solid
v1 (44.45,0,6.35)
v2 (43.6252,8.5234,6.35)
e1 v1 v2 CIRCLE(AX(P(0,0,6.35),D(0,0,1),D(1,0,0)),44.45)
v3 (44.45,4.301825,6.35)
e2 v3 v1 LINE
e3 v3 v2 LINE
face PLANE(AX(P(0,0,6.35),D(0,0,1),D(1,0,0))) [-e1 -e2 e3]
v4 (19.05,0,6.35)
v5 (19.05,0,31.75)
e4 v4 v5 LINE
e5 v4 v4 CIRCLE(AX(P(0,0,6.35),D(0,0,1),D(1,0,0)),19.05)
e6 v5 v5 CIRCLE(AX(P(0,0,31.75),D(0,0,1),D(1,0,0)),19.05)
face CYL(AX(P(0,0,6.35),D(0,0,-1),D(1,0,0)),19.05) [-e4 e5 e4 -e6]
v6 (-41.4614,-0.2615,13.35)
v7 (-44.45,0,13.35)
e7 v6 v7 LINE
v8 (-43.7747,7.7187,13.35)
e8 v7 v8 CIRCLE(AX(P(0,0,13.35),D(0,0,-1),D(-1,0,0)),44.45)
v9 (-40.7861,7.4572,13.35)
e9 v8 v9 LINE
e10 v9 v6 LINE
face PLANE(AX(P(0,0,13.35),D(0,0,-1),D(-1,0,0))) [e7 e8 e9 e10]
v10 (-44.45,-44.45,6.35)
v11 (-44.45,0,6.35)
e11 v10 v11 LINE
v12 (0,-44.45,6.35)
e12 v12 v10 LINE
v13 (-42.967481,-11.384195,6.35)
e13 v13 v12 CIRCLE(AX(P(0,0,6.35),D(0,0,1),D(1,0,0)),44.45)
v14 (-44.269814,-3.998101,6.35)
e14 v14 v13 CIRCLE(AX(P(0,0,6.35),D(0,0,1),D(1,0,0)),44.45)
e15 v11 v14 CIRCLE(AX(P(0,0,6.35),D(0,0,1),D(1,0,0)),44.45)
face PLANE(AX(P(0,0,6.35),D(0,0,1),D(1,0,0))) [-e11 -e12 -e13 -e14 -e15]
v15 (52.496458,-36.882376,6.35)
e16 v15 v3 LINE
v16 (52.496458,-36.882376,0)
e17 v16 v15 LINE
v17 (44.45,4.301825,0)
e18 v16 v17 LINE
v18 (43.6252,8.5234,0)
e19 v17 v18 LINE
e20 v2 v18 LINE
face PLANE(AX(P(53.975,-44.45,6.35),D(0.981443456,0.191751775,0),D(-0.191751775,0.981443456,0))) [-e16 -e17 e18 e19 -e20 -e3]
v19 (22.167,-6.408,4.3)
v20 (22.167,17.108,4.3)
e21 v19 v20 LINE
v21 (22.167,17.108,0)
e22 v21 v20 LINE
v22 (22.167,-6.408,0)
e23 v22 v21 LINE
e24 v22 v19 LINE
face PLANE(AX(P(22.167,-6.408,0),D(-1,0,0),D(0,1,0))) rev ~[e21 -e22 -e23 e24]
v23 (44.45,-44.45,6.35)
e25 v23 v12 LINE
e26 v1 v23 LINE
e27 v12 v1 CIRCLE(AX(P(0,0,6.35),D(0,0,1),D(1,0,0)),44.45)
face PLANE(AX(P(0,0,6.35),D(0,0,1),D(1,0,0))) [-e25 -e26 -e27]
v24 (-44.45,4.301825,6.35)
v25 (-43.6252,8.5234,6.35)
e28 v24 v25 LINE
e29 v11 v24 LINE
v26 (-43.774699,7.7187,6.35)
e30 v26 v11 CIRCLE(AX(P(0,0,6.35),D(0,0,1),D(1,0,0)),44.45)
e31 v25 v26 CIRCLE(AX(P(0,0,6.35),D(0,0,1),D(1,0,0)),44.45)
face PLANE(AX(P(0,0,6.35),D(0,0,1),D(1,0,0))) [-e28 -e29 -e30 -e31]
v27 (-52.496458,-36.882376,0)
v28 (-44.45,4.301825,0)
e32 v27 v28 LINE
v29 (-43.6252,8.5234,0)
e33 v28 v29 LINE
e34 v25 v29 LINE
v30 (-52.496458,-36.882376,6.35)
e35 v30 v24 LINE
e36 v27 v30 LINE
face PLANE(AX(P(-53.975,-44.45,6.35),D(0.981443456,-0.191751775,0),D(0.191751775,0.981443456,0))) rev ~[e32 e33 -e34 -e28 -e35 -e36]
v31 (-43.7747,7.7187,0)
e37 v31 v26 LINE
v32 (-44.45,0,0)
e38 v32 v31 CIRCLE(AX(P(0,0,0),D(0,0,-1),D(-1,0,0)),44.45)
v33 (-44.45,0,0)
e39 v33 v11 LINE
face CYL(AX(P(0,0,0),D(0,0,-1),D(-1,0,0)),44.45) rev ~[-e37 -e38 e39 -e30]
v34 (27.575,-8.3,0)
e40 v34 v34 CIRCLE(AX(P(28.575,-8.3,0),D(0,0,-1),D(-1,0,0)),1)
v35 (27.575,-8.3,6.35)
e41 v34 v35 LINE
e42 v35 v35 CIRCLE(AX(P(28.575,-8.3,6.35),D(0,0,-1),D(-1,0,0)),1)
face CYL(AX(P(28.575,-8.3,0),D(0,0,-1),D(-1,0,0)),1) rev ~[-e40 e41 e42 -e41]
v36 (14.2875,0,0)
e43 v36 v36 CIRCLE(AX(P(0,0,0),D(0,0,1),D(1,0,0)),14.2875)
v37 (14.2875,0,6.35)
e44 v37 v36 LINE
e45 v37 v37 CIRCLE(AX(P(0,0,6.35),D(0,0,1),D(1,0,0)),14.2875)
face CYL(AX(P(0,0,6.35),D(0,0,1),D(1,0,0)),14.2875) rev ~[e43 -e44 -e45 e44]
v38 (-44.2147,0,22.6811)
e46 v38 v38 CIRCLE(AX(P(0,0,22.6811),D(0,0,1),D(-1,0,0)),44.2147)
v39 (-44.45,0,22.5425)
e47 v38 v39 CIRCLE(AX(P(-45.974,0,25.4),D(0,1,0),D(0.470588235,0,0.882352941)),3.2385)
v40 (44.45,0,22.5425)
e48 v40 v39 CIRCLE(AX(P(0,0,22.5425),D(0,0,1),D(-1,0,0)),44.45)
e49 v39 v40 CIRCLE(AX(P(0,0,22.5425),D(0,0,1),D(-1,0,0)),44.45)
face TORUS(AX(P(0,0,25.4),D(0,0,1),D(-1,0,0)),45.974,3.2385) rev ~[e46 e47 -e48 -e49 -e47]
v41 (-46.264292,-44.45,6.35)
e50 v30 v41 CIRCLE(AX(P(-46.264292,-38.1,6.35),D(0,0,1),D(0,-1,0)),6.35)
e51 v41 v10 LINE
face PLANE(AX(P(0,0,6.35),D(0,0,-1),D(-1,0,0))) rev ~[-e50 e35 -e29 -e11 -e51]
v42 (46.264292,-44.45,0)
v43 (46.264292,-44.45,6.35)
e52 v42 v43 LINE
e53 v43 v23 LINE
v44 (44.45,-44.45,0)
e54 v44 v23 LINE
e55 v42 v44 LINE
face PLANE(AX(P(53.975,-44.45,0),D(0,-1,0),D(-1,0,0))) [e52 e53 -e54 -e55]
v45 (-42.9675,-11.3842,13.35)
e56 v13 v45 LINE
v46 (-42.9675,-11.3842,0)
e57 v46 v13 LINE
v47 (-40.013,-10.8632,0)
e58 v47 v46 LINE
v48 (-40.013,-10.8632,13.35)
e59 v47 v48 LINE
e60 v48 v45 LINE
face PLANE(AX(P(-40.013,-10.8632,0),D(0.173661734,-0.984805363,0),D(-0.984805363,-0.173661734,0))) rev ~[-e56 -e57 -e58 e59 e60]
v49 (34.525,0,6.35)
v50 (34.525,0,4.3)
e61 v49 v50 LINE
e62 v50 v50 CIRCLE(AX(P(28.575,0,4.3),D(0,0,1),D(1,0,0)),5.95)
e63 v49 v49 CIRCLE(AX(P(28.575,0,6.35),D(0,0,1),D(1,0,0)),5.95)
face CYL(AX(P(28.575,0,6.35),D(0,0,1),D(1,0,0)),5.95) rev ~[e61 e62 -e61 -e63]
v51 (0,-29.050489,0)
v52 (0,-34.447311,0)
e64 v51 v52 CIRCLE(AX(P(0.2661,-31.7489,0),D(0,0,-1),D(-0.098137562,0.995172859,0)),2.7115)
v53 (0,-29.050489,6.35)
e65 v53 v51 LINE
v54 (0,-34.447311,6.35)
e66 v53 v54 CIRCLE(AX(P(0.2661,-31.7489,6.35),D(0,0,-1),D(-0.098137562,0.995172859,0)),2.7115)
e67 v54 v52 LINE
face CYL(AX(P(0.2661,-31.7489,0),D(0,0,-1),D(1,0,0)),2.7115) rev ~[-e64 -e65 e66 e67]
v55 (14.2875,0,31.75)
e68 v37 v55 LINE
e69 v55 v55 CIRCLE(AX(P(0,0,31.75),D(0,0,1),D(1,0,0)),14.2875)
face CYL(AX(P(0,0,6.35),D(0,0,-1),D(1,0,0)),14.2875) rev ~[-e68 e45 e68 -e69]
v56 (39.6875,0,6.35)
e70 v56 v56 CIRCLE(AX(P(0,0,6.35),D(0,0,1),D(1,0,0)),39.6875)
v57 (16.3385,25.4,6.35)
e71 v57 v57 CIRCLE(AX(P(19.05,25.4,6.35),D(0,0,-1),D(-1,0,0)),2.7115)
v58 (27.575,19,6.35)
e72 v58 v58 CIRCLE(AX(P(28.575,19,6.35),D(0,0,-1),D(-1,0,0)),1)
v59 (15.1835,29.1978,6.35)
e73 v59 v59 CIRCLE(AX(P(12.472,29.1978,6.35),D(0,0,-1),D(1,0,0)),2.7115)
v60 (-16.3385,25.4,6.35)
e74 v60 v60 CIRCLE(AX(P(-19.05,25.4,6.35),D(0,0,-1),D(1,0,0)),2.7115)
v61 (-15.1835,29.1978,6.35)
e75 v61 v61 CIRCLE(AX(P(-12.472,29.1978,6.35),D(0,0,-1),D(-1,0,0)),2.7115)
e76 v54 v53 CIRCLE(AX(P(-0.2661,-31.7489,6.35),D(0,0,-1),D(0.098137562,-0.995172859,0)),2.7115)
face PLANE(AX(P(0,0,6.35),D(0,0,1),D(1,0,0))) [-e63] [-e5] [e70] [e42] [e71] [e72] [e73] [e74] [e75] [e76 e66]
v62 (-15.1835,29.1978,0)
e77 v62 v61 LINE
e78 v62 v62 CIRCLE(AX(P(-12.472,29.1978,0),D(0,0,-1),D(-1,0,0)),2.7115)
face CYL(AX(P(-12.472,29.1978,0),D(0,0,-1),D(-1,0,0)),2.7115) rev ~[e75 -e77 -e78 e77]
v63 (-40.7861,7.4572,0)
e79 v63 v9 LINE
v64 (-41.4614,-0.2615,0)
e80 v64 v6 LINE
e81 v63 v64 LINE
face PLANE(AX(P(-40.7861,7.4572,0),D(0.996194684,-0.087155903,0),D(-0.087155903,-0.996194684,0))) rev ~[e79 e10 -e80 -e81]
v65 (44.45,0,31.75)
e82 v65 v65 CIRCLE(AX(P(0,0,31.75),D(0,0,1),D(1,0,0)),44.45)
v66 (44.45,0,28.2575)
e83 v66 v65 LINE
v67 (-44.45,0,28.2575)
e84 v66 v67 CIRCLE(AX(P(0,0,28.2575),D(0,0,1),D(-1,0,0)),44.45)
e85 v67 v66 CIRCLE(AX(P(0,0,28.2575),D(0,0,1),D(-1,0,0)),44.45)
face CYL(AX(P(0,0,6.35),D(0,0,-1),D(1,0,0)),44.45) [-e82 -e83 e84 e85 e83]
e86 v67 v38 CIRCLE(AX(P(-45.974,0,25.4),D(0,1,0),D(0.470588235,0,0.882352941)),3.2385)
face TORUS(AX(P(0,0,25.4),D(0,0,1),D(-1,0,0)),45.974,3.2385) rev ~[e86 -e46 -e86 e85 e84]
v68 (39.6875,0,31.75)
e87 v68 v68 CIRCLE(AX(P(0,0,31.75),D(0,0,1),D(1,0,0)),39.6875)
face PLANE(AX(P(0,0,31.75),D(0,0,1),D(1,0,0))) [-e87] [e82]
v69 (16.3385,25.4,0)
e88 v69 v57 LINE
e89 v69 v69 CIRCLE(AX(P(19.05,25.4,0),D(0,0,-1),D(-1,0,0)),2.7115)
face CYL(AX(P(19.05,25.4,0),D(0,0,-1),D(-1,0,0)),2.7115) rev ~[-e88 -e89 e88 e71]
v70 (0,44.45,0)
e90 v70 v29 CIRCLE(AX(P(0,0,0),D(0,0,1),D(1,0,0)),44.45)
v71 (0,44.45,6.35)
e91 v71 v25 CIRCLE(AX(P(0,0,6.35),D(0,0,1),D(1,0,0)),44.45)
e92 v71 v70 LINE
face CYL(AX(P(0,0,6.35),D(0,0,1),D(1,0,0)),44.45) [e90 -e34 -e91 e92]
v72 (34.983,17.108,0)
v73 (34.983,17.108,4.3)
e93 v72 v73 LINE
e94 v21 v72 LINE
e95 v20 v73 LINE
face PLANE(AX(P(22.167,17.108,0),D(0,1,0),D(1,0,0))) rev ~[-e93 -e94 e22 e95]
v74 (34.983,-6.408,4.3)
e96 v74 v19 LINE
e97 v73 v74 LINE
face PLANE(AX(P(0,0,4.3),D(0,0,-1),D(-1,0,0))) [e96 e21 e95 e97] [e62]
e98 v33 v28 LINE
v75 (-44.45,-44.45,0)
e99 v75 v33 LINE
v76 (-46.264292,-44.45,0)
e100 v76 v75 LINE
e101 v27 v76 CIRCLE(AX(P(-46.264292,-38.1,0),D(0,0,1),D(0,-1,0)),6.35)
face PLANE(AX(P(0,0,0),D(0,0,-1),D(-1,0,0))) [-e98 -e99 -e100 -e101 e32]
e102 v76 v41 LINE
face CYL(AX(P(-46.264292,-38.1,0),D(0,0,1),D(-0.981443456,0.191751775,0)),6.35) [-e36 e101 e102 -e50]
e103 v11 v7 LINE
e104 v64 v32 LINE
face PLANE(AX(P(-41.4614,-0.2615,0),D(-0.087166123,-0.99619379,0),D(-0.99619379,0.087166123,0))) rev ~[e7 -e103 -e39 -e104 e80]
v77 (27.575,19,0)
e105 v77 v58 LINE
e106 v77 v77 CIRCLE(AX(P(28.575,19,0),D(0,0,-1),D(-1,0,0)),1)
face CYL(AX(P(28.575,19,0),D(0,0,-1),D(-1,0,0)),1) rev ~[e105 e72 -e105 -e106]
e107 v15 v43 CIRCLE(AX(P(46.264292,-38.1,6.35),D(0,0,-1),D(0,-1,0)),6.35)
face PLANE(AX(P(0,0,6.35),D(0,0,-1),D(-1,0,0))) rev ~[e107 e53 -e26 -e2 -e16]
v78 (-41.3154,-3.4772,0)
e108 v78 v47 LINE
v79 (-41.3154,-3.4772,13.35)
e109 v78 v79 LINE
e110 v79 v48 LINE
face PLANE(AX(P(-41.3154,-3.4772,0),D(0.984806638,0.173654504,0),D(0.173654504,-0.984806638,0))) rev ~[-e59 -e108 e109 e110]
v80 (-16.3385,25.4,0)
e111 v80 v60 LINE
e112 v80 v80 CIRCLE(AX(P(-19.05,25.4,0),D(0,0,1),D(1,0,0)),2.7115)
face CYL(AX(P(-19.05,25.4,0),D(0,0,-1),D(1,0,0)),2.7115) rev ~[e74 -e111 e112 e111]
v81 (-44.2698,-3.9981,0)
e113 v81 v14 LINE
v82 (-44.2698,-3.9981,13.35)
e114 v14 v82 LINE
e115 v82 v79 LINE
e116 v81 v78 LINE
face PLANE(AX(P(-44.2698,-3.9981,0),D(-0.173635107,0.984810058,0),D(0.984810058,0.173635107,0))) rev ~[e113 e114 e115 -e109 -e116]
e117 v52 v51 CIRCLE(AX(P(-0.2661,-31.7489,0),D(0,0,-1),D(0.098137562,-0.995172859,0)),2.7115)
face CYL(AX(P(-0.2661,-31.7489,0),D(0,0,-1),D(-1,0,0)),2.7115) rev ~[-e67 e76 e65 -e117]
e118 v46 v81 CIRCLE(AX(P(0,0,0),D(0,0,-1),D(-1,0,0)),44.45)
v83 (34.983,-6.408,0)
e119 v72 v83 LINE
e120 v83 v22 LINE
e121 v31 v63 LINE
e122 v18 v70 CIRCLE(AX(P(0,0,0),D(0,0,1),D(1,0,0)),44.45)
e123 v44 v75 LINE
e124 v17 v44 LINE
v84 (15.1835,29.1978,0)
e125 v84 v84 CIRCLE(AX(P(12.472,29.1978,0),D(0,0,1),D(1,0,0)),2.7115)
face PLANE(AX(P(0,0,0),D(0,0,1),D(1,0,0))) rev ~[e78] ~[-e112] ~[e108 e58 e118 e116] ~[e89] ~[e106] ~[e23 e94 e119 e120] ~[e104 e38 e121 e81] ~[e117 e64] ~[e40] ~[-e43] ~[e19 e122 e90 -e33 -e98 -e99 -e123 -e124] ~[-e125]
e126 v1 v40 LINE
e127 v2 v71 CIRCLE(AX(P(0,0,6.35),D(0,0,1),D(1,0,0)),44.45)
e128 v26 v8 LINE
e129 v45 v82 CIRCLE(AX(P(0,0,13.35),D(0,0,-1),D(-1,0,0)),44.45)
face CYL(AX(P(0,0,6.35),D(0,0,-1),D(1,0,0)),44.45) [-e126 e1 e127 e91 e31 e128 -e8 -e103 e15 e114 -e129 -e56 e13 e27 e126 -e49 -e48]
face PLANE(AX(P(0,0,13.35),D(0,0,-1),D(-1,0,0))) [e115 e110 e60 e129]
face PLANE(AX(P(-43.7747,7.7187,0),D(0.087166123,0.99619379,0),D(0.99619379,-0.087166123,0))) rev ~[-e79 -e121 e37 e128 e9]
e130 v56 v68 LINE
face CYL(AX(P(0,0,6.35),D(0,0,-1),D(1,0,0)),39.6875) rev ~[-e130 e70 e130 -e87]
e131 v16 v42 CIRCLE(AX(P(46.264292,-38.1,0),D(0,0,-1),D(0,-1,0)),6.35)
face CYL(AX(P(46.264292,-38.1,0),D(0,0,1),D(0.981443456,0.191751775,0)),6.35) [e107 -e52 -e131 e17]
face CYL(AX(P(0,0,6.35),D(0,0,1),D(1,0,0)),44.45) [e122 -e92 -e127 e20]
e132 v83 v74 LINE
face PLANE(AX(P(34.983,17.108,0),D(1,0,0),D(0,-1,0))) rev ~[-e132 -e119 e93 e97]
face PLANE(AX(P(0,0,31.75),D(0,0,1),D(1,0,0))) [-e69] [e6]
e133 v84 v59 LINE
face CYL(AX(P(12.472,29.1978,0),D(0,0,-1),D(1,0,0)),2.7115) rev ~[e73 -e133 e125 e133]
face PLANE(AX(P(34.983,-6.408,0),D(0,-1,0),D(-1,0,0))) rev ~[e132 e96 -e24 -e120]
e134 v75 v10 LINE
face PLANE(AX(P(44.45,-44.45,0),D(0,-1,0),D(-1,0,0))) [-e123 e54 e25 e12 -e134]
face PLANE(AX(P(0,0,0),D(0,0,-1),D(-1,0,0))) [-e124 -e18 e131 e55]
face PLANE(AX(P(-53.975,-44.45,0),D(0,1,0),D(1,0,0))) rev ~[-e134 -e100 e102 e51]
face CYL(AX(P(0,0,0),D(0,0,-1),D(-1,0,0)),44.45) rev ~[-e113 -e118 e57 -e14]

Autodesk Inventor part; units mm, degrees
ref_plane "YZ Plane" through (0, 0, 0) normal (1, 0, 0) x (0, 1, 0)
ref_plane "XZ Plane" through (0, 0, 0) normal (0, 1, 0) x (-1, 0, 0)
ref_plane "XY Plane" through (0, 0, 0) normal (0, 0, 1) x (1, 0, 0)
sketch "Sketch1" plane through (0, 0, 0) normal (0, 0, 1) x (1, 0, 0)
  circle A0 centre (0, 0) radius 44.45
  line L0 (-44.45, 44.45) -> (44.45, 44.45)
  line L1 (44.45, 44.45) -> (44.45, -44.45)
  line L2 (44.45, -44.45) -> (-44.45, -44.45)
  line L3 (-44.45, -44.45) -> (-44.45, 44.45)
  dimension "d0" = 88.9
  dimension "d1" = 88.9
  dimension "d2" = 88.9
  dimension "d3" = 44.45
  dimension "d4" = 44.45
extrude "Extrusion1" add sketch "Sketch1" along normal blind 6.35
sketch "Sketch2" plane through (0, 0, 6.35) normal (0, 0, 1) x (1, 0, 0)
  circle A0 centre (0, 0) radius 46.0375
  circle A1 centre (0, 0) radius 44.45
  circle A2 centre (0, 0) radius 39.6875
  dimension "d8" = 1.5875
  dimension "d46" = 88.9
  dimension "d82" = 79.375
extrude "Extrusion2" add sketch "Sketch2" along normal blind 25.4 contours A1
sketch "Sketch3" plane through (0, 0, 6.35) normal (0, 0, 1) x (1, 0, 0)
  circle A0 centre (0, 0) radius 14.2875
  dimension "d11" = 28.575
extrude "Extrusion3" cut sketch "Sketch3" against normal blind 38.1
sketch "Sketch4" plane through (0, 0, 6.35) normal (0, 0, 1) x (1, 0, 0)
  circle A0 centre (0, 0) radius 14.2875 projected
  circle A1 centre (0, 0) radius 19.05
  dimension "d14" = 38.1
extrude "Extrusion4" add sketch "Sketch4" along normal blind 25.4
sketch "Sketch7" plane through (0, 0, 6.35) normal (0, 0, 1) x (1, 0, 0)
  line L0 (44.45, 44.45) -> (0, 44.45) projected
  line L1 (-44.45, 44.45) -> (-44.45, 0) projected
  line L2 (-44.45, -44.45) -> (0, -44.45) projected
  line L3 (44.45, -44.45) -> (44.45, 0) projected
  line L4 (44.45, -44.45) -> (44.45, 44.45) projected
  line L5 (-44.45, 0) -> (-44.45, -44.45)
  line L6 (-44.45, -44.45) -> (0, -44.45)
  line L7 (44.45, -44.45) -> (-44.45, -44.45) projected
  line L8 (0, -44.45) -> (44.45, -44.45)
  line L9 (44.45, -44.45) -> (44.45, 0)
  arc A0 (-44.45, 0) -> (0, -44.45) centre (0, 0) ccw
  arc A1 (0, -44.45) -> (44.45, 0) centre (0, 0) ccw
  arc A2 (44.45, 0) -> (0, 44.45) centre (0, 0) ccw projected
  line L10 (44.45, 0) -> (44.45, 44.45) projected
  arc A3 (0, 44.45) -> (-44.45, 0) centre (0, 0) ccw projected
  line L11 (0, 44.45) -> (-44.45, 44.45) projected
  arc A4 (-44.45, 0) -> (0, -44.45) centre (0, 0) ccw projected
  line L12 (-44.45, 0) -> (-44.45, -44.45) projected
  arc A5 (0, -44.45) -> (44.45, 0) centre (0, 0) ccw projected
  line L13 (0, -44.45) -> (44.45, -44.45) projected
  point P0 (-44.4261, -1.4578)
  point P1 (44.4261, -1.4578)
extrude "Extrusion7" [suppressed]
sketch "Sketch8" plane through (0, 0, 0) normal (0, 1, 0) x (-1, 0, 0)
  line L0 (44.45, 6.35) -> (44.45, 31.75) projected
  arc A0 (44.45, 28.2575) -> (44.45, 22.5425) centre (45.974, 25.4) ccw
  line L1 (44.45, 31.75) -> (-44.45, 31.75) projected
  line L2 (0, -7.62) -> (0, 45.72) projected
  arc A1 (44.2147, 22.6811) -> (44.45, 28.2575) centre (45.974, 25.4) ccw
  point P0 (0, 0)
  dimension "d28" = 3.2385
  dimension "d31" = 19.05
  dimension "d45" = 1.7145
revolve "Revolution1" cut sketch "Sketch8" angle 360 about axis through (0, 0, -10) along (0, 0, 1) contours A0 L0
sketch "Sketch11" plane through (0, 0, 0) normal (0, 1, 0) x (-1, 0, 0)
  line L0 (-19.05, 6.35) -> (-19.05, 31.75) projected
  line L1 (-19.05, 38.1) -> (-26.605, 25.4)
  line L2 (-26.605, 25.4) -> (-23.8011, 25.4)
  line L3 (44.45, 28.2575) -> (-44.45, 28.2575) projected
  line L4 (-23.8011, 25.4) -> (-17.684, 35.6829)
  point P0 (0, 0)
  dimension "d43" = 25.4
  dimension "d44" = 12.7
sketch "Sketch12" plane through (-44.45, 44.45, 0) normal (0, 1, 0) x (1, 0, 0)
  line L0 (0, 0) -> (88.9, 0) projected
  line L1 (0, 0) -> (0, -6.35) projected
  line L2 (44.45, -6.35) -> (0, -6.35) projected
  line L3 (88.9, 0) -> (88.9, -6.35) projected
  line L4 (88.9, -6.35) -> (44.45, -6.35) projected
  point P0 (44.45, 0)
sketch "Sketch13" plane through (0, 0, 0) normal (0, 0, -1) x (-1, 0, 0)
  circle A0 centre (0, 0) radius 44.45 projected
  arc A1 (-44.45, 0) -> (0, -44.45) centre (0, 0) ccw projected
  line L0 (-7.4513, 43.821) -> (0.0223, 44.45)
  line L1 (0.0223, 44.45) -> (0.2739, 41.4606)
  line L2 (0.2739, 41.4606) -> (-7.1997, 40.8316)
  line L3 (-7.1997, 40.8316) -> (-7.4513, 43.821)
  line L4 (4.1443, 44.2564) -> (11.526, 42.9296)
  line L5 (11.526, 42.9296) -> (10.9953, 39.9769)
  line L6 (10.9953, 39.9769) -> (3.6136, 41.3037)
  line L7 (3.6136, 41.3037) -> (4.1443, 44.2564)
  line L8 (0, 0) -> (0, 70.1731) construction
  line L9 (0, 0) -> (-12.1854, 69.107) construction
  line L10 (0, 0) -> (-24.0006, 65.9411) construction
  line L11 (0, 0) -> (-35.0865, 60.7717) construction
  line L12 (0, 0) -> (-45.1064, 53.7557) construction
  line L13 (0, 0) -> (-53.7557, 45.1064) construction
  line L14 (0, 0) -> (-60.7717, 35.0865) construction
  line L15 (0, 0) -> (-65.9411, 24.0006) construction
  line L16 (0, 0) -> (-69.107, 12.1854) construction
  line L17 (0, 0) -> (-70.1731, 0) construction
  line L18 (0, 0) -> (-69.107, -12.1854) construction
  line L19 (0, 0) -> (-65.9411, -24.0006) construction
  line L20 (0, 0) -> (-60.7717, -35.0865) construction
  line L21 (0, 0) -> (-53.7557, -45.1064) construction
  line L22 (0, 0) -> (-45.1064, -53.7557) construction
  line L23 (0, 0) -> (-35.0865, -60.7717) construction
  line L24 (0, 0) -> (-24.0006, -65.9411) construction
  line L25 (0, 0) -> (-12.1854, -69.107) construction
  line L26 (0, 0) -> (0, -70.1731) construction
  line L27 (0, 0) -> (12.1854, -69.107) construction
  line L28 (0, 0) -> (24.0006, -65.9411) construction
  line L29 (0, 0) -> (35.0865, -60.7717) construction
  line L30 (0, 0) -> (45.1064, -53.7557) construction
  line L31 (0, 0) -> (53.7557, -45.1064) construction
  line L32 (0, 0) -> (60.7717, -35.0865) construction
  line L33 (0, 0) -> (65.9411, -24.0006) construction
  line L34 (0, 0) -> (69.107, -12.1854) construction
  line L35 (0, 0) -> (70.1731, 0) construction
  line L36 (0, 0) -> (69.107, 12.1854) construction
  line L37 (0, 0) -> (65.9411, 24.0006) construction
  line L38 (0, 0) -> (60.7717, 35.0865) construction
  line L39 (0, 0) -> (53.7557, 45.1064) construction
  line L40 (0, 0) -> (45.1064, 53.7557) construction
  line L41 (0, 0) -> (35.0865, 60.7717) construction
  line L42 (0, 0) -> (24.0006, 65.9411) construction
  line L43 (0, 0) -> (12.1854, 69.107) construction
  arc A2 (0, 44.45) -> (-44.45, 0) centre (0, 0) ccw projected
  line L44 (44.45, 0) -> (43.7747, 7.7187)
  line L45 (43.7747, 7.7187) -> (40.7861, 7.4572)
  line L46 (40.7861, 7.4572) -> (41.4614, -0.2615)
  line L47 (41.4614, -0.2615) -> (44.45, 0)
  circle A3 centre (0, 0) radius 44.45 projected
  line L48 (44.2698, -3.9981) -> (41.3154, -3.4772)
  line L49 (41.3154, -3.4772) -> (40.013, -10.8632)
  line L50 (40.013, -10.8632) -> (42.9675, -11.3842)
  line L51 (44.2698, -3.9981) -> (42.9675, -11.3842)
  dimension "d53" = 7.5
  dimension "d54" = 3
  dimension "d55" = 3
  dimension "d56" = 7.5
  dimension "d59" = 360
  dimension "d61" = 15
  dimension "d95" = 3
  dimension "d98" = 15
  dimension "d99" = 7.5
  dimension "d100" = 3
extrude "Extrusion11" cut sketch "Sketch13" against normal blind 13.35 contours L44 A0 | L47 L46 L45 L44 | L51 L50 L49 L48 | A0 L51
sketch "Sketch14" plane through (0, 0, 0) normal (0, 0, -1) x (-1, 0, 0)
  circle A0 centre (12.472, 29.1978) radius 2.7115
  circle A1 centre (-19.05, 25.4) radius 2.7115
  circle A2 centre (0.2661, -31.7489) radius 2.7115
  circle A3 centre (0, 0) radius 14.2875 projected
  dimension "d64" = 5.4229
  dimension "d71" = 31.75
  dimension "d72" = 31.75
  dimension "d73" = 31.75
  dimension "d74" = 31.75
  dimension "d75" = 60.325
  dimension "d76" = 25.4
extrude "Extrusion12" cut sketch "Sketch14" against normal blind 25.4 contours A0 | A1 | A2
sketch "Sketch15" plane through (0, 0, 0) normal (0, 0, -1) x (-1, 0, 0)
  circle A0 centre (-31.75, 7.75) radius 1.004
  circle A1 centre (-31.75, -7.75) radius 1.004
  circle A2 centre (-31.75, 0) radius 6.35 projected
  point P0 (0, 0)
  dimension "d77" = 7.75
  dimension "d78" = 15.5
  dimension "d79" = 2.008
mirror "Mirror2" about plane through (0, 0, 0) normal (1, 0, 0) of "Extrusion12"
sketch "Sketch16" plane through (0, 0, 6.35) normal (0, 0, 1) x (1, 0, 0)
  circle A0 centre (28.575, 0) radius 5.95
  circle A1 centre (0, 0) radius 14.2875 projected
  dimension "d83" = 11.9
  dimension "d84" = 28.575
extrude "Extrusion14" cut sketch "Sketch16" against normal blind 25.4 contours A0
sketch "Sketch17" plane through (0, 0, 6.35) normal (0, 0, 1) x (1, 0, 0)
  line L0 (23.117, 5.6504) -> (23.117, 7.0495)
  line L1 (25.6612, 6.127) -> (25.6612, -0.8642)
  arc A0 (23.117, 7.0495) -> (25.6612, -0.8642) centre (0.8097, -4.4879) ccw
  arc A1 (25.6612, 6.127) -> (23.117, 5.6504) centre (24.359, 6.0493) ccw
  line L2 (26.9312, -0.7733) -> (26.9312, 5.9401)
  arc A2 (26.9312, 5.9401) -> (21.847, 5.4855) centre (24.359, 6.0493) ccw
  line L3 (21.847, 5.4855) -> (21.847, 11.4358)
  arc A3 (21.847, 11.4358) -> (26.9312, -0.7733) centre (0.8097, -4.4879) ccw
  point P0 (0, 0)
  dimension "d87" = 1.27
extrude "Extrusion15" [suppressed]
sketch "Sketch18" plane through (0, 0, 0) normal (0, 0, -1) x (-1, 0, 0)
  circle A0 centre (-28.575, 19) radius 1 projected
  circle A1 centre (-28.575, -8.3) radius 1 projected
  point P0 (0, 0)
extrude "Extrusion16" cut sketch "Sketch18" against normal blind 25.4
sketch "Sketch19" plane through (0, 0, 0) normal (0, 0, -1) x (-1, 0, 0)
  line L0 (-34.475, 16.6) -> (-22.675, 16.6) projected
  line L1 (-34.475, 16.6) -> (-34.475, -5.9) projected
  line L2 (-22.675, -5.9) -> (-22.675, 16.6) projected
  line L3 (-22.675, -5.9) -> (-34.475, -5.9) projected
  line L4 (-22.167, 17.108) -> (-34.983, 17.108)
  line L5 (-34.983, 17.108) -> (-34.983, -6.408)
  line L6 (-34.983, -6.408) -> (-22.167, -6.408)
  line L7 (-22.167, -6.408) -> (-22.167, 17.108)
  point P0 (0, 0)
  dimension "d92" = 0.508
extrude "Extrusion17" cut sketch "Sketch19" against normal blind 4.3 contours L0 L2 L3 L1 | L7 L6 L5 L4
sketch "Sketch20" plane through (0, 0, 0) normal (0, 0, -1) x (-1, 0, 0)
  line L0 (0, 44.45) -> (44.45, 44.45) projected
  line L1 (44.45, 44.45) -> (53.975, 44.45)
  line L2 (53.975, 44.45) -> (53.975, -44.45)
  line L3 (53.975, -44.45) -> (44.45, -44.45)
  line L4 (44.45, -44.45) -> (44.45, 44.45)
  line L5 (-44.45, 44.45) -> (-53.975, 44.45)
  line L6 (-53.975, 44.45) -> (-53.975, -44.45)
  line L7 (-53.975, -44.45) -> (-44.45, -44.45)
  line L8 (-44.45, -44.45) -> (-44.45, 44.45)
  line L9 (-44.45, -44.45) -> (44.45, -44.45) projected
  line L10 (-44.45, 44.45) -> (-44.45, -44.45) projected
  point P0 (0, 0)
  dimension "d101" = 9.525
  dimension "d102" = 9.525
extrude "Extrusion18" add sketch "Sketch20" against normal up to surface (6.35 mm away)
sketch "Sketch21" plane through (0, 0, 6.35) normal (0, 0, 1) x (1, 0, 0)
  circle A0 centre (0, 0) radius 44.45 projected
  arc A1 (-43.7747, 7.7187) -> (-44.45, 0) centre (0, 0) ccw projected
  line L0 (0, -44.45) -> (53.975, -44.45) projected
  line L1 (53.975, -44.45) -> (43.6252, 8.5234)
  line L2 (-53.975, 44.45) -> (-53.975, -44.45) projected
  line L3 (-53.975, -44.45) -> (-43.6252, 8.5234)
  line L4 (53.975, 44.45) -> (53.975, -44.45) projected
  line L5 (53.975, -44.45) -> (53.975, 44.45)
  line L6 (53.975, 44.45) -> (0, 44.45)
  line L7 (-53.975, 44.45) -> (-53.975, -44.45)
  arc A2 (43.6252, 8.5234) -> (0, 44.45) centre (0, 0) ccw
  line L8 (0, 44.45) -> (-53.975, 44.45)
  arc A3 (0, 44.45) -> (-43.6252, 8.5234) centre (0, 0) ccw
extrude "Extrusion19" cut sketch "Sketch21" against normal up to surface (6.35 mm away) contours A0 L6 L4 L1 | A0 L3 L2 L8
fillet "Fillet1" radius 6.35 2 edges at (53.975, -44.45, 3.175) (-53.975, -44.45, 3.175)
equation "\"d3\" = 0.5 * d1"
equation "\"d4\" = 0.5 * d2"
equation "\"d55\" = d54"
equation "\"d56\" = d53"
equation "\"d95\" = d54"
equation "\"d99\" = d53"
equation "\"d100\" = d54"
equation "\"d77\" = 0.5 * d78"
equation "\"d102\" = d101"
properties part number "mounting plate" material "ABS Plastic"
